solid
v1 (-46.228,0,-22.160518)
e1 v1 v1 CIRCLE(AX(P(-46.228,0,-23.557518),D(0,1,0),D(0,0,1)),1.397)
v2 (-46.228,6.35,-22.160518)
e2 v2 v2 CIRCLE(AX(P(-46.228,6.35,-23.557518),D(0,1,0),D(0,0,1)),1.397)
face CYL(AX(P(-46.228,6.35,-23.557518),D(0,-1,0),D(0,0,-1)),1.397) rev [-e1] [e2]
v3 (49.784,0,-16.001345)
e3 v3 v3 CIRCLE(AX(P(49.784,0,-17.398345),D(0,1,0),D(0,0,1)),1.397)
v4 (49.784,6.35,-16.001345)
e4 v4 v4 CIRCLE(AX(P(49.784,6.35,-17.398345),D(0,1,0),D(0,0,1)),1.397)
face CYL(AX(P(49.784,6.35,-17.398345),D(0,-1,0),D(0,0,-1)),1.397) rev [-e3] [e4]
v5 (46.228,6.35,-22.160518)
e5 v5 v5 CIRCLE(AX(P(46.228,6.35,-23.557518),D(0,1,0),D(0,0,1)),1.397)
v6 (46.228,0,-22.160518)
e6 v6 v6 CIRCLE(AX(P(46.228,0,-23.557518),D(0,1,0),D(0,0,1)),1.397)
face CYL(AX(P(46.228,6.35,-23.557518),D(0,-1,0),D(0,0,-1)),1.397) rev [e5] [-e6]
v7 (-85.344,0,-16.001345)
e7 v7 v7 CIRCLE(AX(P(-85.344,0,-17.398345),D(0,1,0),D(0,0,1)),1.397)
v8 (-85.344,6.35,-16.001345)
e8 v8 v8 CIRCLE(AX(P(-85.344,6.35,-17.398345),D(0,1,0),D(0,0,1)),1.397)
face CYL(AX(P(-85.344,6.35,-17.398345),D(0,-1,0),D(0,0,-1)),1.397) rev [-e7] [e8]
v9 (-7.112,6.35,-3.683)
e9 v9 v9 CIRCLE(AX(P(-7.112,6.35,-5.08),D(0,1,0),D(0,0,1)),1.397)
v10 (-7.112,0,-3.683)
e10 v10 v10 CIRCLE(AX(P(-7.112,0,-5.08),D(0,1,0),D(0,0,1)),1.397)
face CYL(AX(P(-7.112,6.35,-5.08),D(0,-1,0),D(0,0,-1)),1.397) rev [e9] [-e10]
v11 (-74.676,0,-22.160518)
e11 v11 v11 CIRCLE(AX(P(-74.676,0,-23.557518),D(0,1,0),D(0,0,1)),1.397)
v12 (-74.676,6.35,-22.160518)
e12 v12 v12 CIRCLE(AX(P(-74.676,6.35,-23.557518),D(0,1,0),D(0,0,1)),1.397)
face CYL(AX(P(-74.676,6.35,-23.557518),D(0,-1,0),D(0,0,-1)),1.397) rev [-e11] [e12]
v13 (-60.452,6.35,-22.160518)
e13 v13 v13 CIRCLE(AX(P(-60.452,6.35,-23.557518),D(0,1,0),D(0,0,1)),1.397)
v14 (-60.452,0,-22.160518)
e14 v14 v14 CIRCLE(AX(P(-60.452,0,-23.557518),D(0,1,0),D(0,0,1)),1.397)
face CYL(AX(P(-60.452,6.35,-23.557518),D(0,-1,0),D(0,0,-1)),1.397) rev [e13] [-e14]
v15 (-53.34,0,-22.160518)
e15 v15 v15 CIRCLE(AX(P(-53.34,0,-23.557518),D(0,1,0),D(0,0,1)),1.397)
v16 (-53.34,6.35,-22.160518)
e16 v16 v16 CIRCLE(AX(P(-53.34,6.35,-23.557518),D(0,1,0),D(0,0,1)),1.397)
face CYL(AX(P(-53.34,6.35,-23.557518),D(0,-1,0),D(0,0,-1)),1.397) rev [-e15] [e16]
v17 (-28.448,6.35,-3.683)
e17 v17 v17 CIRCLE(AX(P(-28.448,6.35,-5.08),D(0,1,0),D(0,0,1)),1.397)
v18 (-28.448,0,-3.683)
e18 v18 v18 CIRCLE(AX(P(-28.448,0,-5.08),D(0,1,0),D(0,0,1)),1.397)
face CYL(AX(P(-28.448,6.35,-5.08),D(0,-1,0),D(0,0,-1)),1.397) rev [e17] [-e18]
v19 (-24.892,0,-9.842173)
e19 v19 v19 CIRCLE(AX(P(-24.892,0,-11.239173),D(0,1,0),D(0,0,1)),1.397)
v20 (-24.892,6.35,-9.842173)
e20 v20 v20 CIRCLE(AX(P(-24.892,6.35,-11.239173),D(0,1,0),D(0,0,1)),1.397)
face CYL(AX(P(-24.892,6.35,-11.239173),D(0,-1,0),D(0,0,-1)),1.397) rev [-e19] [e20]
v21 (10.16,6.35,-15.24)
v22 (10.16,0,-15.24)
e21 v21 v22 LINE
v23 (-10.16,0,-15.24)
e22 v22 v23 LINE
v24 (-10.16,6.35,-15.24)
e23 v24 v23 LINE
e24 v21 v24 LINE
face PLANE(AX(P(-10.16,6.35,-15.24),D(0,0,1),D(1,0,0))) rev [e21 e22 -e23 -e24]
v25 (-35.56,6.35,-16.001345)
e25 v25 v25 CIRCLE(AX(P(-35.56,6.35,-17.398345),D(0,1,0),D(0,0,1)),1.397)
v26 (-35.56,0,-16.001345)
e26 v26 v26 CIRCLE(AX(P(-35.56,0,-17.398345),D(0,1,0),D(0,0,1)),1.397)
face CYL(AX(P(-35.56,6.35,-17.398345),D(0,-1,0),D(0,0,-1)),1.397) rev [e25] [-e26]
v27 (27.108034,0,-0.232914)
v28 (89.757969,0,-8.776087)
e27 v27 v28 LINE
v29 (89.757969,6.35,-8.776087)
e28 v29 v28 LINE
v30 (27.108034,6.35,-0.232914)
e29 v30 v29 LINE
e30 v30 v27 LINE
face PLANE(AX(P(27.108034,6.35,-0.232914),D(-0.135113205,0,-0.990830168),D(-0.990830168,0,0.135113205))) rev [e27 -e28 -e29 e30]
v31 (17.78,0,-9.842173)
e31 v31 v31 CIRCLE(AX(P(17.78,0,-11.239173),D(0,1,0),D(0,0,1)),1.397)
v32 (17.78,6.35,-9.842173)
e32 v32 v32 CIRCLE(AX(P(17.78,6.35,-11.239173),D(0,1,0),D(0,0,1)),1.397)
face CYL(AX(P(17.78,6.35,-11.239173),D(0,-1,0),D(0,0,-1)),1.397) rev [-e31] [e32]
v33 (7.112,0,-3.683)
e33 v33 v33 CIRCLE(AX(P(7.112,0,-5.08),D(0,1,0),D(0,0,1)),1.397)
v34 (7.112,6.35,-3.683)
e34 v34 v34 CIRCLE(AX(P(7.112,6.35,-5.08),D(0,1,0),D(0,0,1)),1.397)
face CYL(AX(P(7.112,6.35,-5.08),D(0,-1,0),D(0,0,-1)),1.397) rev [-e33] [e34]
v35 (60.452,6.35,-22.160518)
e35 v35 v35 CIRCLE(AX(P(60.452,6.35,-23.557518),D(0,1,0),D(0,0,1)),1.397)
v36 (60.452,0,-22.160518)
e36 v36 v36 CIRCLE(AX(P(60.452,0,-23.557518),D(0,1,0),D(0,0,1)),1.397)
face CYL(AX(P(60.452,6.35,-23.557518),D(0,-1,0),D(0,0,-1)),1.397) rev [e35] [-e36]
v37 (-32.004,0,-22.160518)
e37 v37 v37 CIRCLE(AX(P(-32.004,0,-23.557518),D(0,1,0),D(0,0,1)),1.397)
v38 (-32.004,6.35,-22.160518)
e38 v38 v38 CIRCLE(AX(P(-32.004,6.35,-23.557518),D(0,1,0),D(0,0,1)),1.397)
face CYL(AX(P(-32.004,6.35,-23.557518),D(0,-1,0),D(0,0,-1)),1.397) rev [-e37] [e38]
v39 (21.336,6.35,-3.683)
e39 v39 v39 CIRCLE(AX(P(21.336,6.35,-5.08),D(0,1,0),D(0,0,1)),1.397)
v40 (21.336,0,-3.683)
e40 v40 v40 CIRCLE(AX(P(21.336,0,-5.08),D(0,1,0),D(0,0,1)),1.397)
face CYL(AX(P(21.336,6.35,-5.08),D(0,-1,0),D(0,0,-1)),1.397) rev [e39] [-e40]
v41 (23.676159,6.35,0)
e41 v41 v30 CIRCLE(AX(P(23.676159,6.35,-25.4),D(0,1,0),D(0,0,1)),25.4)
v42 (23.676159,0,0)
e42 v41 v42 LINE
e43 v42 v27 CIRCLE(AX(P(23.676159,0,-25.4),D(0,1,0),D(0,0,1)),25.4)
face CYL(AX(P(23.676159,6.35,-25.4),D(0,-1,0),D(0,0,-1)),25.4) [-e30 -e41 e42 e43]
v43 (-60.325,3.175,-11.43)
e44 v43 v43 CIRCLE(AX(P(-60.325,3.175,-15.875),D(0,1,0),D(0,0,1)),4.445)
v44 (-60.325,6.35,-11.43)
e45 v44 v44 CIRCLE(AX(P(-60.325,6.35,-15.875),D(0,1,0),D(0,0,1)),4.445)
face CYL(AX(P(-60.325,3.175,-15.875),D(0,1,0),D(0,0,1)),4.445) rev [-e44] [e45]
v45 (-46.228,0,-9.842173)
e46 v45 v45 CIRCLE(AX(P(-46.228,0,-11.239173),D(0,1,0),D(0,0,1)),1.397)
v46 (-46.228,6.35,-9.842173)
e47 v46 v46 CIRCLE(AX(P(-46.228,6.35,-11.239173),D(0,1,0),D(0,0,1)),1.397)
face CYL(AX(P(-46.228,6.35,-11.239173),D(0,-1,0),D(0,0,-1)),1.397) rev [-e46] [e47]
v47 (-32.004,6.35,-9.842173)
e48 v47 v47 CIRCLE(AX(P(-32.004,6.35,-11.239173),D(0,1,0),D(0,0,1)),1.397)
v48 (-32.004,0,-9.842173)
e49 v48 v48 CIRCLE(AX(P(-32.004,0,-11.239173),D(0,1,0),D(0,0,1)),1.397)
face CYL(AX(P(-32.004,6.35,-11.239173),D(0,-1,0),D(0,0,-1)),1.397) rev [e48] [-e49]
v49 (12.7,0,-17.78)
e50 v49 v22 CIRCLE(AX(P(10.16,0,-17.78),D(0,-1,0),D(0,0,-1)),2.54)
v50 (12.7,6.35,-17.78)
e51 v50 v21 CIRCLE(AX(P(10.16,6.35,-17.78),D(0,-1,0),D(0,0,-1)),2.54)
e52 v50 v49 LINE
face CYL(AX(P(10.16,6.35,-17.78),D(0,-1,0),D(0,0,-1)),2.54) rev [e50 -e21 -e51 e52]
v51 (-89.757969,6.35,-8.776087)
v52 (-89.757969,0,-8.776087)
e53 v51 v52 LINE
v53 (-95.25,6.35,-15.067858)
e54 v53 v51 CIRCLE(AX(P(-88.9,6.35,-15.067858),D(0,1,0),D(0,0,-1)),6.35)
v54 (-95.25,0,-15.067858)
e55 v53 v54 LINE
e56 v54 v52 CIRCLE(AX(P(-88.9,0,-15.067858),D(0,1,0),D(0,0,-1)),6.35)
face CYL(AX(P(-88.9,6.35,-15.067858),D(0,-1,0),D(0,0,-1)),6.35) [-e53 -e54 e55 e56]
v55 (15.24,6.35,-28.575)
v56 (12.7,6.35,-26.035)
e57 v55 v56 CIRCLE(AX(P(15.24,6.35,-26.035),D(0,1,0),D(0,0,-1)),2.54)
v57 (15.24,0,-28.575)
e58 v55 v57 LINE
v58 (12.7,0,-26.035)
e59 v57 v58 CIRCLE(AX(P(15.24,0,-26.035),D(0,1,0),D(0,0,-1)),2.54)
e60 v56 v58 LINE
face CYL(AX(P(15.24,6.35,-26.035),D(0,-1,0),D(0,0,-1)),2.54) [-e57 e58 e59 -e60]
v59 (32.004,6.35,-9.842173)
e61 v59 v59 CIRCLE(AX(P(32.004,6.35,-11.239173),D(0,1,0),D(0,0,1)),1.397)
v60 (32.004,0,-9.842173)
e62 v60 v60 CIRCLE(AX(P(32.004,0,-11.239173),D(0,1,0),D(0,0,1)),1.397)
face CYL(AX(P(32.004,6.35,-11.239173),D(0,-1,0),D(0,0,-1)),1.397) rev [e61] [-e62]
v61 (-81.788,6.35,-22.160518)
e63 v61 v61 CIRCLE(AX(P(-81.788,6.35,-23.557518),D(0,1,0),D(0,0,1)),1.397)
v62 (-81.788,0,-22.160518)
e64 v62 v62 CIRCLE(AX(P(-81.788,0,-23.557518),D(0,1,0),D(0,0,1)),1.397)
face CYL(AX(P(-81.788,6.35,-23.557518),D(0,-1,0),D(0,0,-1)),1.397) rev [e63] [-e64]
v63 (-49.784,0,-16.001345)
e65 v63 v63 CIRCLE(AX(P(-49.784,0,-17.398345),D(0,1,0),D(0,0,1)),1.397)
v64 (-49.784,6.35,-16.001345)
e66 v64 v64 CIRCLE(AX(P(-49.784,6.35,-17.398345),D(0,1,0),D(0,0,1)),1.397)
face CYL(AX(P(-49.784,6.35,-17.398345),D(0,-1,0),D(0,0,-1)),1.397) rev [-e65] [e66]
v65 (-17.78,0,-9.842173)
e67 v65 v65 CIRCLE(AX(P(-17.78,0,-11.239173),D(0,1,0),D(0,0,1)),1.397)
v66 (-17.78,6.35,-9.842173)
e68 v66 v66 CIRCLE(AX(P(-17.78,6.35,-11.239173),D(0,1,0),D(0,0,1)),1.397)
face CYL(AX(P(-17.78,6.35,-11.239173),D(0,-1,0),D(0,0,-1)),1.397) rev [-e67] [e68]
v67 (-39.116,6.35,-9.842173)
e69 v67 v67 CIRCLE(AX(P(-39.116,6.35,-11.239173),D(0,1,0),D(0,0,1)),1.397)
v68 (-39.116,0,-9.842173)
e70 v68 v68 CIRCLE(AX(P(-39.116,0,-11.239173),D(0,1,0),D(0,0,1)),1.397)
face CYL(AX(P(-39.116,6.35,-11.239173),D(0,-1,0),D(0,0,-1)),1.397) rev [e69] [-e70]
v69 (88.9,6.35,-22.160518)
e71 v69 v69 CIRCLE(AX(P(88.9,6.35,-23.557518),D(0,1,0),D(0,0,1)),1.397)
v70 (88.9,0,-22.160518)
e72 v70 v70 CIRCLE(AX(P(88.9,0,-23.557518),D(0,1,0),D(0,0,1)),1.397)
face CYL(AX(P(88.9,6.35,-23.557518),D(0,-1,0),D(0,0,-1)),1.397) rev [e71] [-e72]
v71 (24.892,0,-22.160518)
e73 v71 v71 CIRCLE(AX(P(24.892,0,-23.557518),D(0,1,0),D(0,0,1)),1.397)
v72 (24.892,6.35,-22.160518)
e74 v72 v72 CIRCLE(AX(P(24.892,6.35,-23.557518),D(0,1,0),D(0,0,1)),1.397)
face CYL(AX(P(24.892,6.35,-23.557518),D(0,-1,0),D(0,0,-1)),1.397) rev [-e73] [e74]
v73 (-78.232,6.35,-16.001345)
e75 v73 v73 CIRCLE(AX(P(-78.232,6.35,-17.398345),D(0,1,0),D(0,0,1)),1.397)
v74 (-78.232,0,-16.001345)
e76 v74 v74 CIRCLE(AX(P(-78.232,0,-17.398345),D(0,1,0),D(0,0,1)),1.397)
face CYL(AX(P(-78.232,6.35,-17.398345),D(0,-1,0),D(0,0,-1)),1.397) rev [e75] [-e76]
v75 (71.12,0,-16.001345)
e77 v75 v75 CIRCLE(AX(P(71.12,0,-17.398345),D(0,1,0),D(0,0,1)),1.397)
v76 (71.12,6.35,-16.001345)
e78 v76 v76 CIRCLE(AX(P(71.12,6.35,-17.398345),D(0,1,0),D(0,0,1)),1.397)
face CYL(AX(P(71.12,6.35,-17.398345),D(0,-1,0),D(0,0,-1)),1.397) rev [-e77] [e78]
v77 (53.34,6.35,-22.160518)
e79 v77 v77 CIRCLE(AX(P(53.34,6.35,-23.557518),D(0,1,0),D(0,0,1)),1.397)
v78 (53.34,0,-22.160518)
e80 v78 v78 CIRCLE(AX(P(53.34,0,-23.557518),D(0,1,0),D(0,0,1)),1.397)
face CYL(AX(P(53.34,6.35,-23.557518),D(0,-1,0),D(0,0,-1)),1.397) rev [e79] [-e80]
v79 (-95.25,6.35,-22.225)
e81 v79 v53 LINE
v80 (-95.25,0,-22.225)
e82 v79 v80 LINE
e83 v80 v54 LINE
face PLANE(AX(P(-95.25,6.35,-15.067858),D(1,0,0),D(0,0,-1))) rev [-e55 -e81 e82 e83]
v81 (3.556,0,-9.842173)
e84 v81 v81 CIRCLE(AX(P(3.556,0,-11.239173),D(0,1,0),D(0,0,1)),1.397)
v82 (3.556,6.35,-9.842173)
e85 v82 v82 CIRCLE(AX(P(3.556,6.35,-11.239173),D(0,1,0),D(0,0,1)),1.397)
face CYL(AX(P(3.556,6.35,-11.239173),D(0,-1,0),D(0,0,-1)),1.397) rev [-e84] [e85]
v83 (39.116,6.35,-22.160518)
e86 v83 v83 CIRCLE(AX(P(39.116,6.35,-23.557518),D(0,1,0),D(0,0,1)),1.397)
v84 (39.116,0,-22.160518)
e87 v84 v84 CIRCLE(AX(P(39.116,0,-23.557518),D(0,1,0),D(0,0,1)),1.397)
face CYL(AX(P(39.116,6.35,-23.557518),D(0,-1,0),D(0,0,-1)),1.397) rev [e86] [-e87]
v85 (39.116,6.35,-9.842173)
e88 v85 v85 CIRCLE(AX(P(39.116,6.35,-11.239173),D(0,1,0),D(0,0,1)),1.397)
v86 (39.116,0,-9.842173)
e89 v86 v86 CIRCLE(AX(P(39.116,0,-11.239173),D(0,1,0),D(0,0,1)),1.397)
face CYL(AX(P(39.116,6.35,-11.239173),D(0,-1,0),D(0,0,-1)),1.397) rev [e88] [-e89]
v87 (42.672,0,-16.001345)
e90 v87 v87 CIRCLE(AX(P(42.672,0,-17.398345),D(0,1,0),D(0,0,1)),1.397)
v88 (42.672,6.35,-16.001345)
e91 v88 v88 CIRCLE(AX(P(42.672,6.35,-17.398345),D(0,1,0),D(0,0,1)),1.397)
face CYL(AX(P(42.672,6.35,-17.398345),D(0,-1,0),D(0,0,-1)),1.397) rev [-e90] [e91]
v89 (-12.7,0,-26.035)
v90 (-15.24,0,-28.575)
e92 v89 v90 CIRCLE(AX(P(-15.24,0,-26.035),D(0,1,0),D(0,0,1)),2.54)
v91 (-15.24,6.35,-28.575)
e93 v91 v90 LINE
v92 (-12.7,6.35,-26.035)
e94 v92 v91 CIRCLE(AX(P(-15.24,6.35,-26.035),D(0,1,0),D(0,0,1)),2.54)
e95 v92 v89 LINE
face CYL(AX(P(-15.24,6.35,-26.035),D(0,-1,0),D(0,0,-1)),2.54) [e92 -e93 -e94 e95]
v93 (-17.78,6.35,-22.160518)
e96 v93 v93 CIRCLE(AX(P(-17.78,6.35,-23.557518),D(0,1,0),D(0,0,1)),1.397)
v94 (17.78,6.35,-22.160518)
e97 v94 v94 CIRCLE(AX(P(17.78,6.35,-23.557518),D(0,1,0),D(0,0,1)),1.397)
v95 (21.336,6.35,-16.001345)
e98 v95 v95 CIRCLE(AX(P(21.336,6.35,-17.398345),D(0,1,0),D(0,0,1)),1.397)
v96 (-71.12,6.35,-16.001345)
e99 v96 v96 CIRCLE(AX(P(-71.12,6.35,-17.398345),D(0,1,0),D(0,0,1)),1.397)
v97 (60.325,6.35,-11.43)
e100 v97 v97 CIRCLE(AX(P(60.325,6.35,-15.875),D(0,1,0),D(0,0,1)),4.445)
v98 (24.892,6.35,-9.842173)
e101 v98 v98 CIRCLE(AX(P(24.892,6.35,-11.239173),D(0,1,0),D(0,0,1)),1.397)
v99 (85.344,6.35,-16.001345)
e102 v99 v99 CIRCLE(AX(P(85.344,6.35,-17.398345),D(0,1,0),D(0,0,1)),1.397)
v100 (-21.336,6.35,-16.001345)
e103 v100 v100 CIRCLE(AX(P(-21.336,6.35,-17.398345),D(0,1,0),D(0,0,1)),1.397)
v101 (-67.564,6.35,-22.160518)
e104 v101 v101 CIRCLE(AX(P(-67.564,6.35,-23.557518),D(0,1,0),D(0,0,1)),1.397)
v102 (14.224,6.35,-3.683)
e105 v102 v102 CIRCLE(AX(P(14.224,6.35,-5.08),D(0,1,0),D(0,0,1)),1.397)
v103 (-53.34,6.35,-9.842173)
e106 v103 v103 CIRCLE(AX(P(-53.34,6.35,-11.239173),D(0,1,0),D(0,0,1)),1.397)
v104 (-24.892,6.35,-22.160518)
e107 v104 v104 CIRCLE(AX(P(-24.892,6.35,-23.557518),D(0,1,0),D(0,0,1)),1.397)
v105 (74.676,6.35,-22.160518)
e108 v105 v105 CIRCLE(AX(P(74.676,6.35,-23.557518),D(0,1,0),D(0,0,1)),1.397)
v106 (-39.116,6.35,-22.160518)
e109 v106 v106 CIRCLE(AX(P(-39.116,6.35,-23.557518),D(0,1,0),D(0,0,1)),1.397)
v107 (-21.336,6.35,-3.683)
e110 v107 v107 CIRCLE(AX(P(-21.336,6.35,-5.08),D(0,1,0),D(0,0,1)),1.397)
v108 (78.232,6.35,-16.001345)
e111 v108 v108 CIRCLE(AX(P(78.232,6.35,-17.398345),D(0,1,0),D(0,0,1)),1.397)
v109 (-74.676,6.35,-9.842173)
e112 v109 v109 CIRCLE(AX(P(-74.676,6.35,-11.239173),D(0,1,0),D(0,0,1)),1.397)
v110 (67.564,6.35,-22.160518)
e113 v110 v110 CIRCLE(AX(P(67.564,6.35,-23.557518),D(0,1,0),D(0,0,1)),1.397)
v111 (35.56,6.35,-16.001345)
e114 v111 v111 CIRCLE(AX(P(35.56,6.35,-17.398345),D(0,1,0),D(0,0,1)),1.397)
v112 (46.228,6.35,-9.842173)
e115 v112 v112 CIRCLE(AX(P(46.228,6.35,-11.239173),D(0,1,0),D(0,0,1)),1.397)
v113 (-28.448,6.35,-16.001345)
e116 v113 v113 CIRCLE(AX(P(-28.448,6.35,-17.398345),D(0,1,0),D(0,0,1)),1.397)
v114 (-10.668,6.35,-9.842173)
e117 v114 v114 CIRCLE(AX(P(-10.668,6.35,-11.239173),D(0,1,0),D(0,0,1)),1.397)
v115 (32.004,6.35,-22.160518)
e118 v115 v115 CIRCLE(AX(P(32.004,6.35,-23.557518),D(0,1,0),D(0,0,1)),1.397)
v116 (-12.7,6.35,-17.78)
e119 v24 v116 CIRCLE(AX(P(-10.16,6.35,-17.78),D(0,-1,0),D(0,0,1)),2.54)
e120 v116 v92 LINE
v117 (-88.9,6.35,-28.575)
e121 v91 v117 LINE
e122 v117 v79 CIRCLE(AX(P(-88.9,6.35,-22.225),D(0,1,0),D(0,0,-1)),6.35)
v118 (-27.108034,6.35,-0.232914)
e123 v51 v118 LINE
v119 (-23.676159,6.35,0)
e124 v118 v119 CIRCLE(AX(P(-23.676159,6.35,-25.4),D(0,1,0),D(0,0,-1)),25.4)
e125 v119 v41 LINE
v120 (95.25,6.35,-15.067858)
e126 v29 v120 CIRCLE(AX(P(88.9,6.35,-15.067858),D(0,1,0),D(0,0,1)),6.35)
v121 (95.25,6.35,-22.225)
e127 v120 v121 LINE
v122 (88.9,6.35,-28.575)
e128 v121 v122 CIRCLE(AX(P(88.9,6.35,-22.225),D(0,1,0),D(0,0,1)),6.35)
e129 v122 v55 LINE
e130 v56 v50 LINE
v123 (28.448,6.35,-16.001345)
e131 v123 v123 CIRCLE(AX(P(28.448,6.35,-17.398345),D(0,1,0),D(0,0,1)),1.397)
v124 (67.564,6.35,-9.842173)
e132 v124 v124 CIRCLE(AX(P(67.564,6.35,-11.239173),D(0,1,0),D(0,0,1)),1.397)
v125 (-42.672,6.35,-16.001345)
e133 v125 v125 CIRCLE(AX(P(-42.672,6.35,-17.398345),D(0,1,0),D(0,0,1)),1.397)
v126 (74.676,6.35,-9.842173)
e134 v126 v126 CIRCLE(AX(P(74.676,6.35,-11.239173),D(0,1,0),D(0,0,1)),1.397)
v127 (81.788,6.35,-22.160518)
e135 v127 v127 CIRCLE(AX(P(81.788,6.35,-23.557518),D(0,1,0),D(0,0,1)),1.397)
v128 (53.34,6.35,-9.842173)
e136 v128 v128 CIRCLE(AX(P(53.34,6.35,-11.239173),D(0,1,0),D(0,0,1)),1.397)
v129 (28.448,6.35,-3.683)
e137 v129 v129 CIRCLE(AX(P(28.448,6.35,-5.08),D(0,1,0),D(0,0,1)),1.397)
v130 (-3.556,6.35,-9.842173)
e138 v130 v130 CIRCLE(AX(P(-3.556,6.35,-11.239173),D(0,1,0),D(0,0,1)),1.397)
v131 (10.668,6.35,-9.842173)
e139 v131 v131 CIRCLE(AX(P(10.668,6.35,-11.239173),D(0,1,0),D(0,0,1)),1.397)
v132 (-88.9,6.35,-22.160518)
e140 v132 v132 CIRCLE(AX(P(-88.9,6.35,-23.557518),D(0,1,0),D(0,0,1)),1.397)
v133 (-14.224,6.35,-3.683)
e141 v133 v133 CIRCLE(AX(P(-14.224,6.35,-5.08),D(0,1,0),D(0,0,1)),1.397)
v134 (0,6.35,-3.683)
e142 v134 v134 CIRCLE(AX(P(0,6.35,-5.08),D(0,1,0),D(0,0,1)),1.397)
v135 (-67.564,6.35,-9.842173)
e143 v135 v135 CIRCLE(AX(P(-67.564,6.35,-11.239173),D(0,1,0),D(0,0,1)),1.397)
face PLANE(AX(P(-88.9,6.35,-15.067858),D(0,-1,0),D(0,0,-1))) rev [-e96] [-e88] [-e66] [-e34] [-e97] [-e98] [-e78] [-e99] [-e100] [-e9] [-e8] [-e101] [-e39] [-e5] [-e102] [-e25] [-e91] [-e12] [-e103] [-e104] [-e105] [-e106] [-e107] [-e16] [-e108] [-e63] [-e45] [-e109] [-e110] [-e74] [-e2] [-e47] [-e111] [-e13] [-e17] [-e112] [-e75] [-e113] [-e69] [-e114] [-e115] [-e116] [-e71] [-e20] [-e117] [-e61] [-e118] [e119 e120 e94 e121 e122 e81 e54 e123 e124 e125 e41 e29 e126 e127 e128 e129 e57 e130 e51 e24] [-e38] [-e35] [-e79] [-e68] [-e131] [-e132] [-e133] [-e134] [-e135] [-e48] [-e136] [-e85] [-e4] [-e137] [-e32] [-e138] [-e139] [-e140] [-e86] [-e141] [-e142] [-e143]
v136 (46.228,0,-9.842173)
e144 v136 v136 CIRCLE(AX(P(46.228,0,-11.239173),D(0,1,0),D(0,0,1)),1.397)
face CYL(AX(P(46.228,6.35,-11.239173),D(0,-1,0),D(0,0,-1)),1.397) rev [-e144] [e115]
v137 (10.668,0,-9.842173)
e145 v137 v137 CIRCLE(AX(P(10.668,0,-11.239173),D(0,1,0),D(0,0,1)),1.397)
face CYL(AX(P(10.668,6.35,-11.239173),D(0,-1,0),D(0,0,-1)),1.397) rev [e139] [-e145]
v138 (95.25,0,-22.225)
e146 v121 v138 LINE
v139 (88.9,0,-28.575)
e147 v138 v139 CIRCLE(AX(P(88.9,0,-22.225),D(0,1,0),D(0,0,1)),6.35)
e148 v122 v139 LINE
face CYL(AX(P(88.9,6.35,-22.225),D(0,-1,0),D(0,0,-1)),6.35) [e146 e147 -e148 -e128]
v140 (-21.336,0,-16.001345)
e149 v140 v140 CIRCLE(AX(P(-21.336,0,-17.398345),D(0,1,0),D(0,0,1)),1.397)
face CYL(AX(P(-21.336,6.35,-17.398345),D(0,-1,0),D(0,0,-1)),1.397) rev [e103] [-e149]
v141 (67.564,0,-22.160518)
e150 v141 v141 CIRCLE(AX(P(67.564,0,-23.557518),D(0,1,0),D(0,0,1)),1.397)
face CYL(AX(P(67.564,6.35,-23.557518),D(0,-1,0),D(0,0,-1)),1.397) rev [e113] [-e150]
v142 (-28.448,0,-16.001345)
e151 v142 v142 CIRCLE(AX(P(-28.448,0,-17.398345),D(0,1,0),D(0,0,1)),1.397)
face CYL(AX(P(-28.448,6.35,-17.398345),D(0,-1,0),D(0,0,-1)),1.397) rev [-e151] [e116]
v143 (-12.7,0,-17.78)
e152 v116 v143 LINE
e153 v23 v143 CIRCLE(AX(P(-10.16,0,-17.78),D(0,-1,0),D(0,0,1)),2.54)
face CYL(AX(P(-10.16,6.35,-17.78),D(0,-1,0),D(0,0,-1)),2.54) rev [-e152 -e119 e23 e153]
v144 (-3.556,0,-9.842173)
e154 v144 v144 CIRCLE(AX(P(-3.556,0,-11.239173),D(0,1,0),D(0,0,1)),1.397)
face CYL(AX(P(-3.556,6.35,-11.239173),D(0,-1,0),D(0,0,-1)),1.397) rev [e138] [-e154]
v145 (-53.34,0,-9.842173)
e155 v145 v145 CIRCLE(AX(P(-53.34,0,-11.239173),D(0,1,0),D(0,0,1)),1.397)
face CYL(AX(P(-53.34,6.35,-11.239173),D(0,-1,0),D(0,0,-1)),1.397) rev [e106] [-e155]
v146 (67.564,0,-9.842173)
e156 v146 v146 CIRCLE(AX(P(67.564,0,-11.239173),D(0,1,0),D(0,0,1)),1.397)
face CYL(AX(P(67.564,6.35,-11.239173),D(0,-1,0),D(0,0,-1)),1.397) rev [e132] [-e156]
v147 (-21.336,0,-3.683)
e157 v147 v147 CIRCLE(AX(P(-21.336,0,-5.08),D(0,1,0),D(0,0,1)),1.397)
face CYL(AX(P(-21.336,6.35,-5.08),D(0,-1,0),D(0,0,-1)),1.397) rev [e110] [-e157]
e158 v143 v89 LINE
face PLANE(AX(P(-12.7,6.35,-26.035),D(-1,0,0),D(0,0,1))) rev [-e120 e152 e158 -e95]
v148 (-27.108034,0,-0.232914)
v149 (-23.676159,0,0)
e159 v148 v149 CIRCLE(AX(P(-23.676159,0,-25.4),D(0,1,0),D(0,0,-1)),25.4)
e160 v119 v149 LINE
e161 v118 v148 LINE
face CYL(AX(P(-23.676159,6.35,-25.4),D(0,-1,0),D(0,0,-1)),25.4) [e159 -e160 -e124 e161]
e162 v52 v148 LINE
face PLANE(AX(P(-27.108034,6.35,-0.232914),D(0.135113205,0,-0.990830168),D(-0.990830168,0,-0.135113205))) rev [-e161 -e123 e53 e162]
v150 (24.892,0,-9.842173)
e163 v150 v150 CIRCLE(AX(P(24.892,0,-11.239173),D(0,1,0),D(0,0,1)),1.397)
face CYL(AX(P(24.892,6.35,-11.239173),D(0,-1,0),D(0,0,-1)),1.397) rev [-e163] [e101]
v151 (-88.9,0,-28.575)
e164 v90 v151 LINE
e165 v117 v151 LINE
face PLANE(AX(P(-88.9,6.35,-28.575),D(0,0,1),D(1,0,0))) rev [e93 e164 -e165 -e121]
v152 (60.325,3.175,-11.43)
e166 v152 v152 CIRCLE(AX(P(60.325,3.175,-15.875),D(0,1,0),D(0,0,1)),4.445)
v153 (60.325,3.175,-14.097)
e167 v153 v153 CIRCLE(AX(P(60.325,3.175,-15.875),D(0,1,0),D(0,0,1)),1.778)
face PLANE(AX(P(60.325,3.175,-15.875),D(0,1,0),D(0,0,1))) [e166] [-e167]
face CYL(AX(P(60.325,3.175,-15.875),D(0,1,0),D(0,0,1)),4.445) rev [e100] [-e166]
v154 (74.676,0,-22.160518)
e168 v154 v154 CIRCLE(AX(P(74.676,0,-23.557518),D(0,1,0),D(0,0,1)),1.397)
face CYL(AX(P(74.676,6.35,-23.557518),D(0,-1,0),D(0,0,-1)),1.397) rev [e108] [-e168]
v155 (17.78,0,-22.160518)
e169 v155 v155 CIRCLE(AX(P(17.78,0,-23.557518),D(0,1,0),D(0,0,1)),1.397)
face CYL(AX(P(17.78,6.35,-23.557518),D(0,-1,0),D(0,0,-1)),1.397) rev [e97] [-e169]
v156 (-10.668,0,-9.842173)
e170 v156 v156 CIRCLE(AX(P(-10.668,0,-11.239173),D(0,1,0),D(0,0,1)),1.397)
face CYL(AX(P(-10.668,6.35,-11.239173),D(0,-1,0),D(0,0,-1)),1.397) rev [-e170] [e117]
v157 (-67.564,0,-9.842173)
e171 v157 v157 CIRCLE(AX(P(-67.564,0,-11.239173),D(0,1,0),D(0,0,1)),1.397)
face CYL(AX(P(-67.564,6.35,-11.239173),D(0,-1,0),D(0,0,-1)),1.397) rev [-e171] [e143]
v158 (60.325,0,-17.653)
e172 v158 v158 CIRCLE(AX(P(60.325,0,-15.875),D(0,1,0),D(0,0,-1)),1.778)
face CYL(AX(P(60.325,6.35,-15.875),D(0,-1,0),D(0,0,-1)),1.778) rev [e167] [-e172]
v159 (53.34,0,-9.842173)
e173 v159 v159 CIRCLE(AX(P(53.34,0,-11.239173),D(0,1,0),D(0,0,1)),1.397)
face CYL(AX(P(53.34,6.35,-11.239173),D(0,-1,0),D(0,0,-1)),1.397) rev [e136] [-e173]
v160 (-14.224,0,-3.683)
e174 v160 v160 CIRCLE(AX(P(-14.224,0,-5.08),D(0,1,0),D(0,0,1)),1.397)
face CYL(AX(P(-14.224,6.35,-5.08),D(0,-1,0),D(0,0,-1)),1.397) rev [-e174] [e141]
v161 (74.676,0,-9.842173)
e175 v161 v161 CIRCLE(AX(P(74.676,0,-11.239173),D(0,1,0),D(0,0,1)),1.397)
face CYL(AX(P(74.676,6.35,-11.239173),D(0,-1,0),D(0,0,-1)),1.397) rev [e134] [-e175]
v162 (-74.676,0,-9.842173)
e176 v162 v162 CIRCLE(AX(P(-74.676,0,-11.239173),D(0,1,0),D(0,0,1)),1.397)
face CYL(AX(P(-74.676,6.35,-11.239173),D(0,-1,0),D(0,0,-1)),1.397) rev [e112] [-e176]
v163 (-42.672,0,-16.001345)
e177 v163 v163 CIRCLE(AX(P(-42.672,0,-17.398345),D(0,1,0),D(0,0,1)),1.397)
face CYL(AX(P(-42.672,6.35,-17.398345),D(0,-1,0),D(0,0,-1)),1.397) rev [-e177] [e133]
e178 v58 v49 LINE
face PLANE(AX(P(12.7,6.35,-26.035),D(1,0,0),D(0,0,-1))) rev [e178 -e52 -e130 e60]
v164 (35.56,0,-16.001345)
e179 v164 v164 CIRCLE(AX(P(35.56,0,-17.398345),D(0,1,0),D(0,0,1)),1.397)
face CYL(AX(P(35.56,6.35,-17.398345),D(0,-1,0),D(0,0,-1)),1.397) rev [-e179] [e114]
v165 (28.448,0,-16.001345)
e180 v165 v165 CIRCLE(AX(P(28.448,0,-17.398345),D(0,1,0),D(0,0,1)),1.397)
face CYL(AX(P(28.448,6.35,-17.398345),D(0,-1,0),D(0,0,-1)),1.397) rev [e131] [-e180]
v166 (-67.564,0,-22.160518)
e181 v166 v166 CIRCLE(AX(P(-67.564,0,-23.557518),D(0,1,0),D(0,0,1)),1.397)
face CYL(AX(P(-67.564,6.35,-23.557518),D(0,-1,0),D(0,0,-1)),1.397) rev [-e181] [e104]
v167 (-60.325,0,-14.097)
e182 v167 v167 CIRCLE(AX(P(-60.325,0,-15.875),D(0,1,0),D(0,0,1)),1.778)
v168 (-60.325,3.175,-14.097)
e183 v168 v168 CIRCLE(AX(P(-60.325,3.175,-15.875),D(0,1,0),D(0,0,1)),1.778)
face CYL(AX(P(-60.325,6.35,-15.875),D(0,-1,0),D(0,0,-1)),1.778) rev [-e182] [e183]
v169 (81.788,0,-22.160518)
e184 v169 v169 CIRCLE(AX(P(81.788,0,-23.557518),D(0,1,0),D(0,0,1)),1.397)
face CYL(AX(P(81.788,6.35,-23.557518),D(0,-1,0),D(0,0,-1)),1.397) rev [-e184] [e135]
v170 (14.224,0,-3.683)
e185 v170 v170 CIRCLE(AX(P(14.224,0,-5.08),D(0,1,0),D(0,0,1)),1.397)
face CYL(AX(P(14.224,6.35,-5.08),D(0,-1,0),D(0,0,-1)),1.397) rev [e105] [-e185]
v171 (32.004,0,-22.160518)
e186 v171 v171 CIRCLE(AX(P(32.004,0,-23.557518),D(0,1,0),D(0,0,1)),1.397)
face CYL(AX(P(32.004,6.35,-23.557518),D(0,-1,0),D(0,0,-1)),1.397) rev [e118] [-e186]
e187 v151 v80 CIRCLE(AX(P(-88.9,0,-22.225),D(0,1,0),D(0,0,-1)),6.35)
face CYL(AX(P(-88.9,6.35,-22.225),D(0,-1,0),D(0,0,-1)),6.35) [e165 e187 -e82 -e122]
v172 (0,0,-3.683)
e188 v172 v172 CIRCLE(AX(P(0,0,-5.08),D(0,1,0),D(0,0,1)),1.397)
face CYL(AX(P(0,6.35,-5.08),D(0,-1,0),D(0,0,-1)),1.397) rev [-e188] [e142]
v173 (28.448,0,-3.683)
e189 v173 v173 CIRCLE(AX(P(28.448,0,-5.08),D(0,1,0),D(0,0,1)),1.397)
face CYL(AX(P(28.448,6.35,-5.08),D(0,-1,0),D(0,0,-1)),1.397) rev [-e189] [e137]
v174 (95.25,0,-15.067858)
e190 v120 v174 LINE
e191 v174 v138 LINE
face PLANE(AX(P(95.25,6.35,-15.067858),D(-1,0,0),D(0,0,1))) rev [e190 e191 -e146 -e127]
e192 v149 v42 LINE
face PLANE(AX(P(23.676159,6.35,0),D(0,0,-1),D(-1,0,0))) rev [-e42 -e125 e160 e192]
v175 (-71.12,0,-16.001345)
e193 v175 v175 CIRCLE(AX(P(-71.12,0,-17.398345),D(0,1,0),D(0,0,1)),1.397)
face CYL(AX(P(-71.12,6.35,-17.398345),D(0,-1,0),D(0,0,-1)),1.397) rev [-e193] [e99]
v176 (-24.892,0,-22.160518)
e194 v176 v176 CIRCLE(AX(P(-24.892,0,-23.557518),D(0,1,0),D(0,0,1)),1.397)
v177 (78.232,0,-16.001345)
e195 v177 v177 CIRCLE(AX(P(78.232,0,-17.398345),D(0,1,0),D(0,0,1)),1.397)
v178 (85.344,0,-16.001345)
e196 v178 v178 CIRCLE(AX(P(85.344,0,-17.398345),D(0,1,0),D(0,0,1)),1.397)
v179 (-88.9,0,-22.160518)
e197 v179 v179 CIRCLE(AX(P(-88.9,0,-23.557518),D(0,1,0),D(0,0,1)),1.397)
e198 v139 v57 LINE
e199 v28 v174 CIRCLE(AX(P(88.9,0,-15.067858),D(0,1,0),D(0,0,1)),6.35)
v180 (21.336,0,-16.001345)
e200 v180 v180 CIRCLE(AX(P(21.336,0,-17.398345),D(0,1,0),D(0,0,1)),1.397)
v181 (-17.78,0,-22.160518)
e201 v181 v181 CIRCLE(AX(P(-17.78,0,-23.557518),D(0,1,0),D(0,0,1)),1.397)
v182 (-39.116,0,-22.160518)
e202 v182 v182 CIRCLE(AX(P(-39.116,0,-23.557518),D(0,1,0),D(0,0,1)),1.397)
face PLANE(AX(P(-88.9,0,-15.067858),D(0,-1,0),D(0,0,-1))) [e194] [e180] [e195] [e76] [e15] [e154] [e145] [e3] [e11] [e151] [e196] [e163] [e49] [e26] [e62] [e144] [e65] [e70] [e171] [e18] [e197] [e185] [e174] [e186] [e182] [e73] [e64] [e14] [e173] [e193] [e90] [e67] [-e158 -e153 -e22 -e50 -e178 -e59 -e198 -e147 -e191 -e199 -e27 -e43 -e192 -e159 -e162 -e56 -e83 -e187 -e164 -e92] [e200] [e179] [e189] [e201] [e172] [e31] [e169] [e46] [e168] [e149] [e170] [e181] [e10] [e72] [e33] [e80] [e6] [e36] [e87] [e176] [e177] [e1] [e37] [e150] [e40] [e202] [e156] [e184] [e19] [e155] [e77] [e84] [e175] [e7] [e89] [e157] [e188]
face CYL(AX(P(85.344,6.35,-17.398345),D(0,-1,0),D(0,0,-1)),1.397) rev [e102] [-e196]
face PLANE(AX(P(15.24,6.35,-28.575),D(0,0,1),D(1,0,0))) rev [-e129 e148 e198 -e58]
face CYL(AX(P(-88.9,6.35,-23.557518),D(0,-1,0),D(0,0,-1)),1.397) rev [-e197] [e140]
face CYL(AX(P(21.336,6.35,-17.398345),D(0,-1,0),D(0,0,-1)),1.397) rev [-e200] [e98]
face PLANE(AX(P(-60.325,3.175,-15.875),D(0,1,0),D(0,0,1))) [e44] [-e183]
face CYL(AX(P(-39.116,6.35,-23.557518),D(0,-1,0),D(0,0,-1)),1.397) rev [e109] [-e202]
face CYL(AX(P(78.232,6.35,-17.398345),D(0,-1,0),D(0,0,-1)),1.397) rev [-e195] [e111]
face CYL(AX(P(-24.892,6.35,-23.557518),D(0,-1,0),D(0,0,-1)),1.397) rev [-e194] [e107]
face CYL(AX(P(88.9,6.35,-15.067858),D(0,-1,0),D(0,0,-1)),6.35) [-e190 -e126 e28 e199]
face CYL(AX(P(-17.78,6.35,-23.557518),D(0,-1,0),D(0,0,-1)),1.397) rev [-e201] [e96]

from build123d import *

# Parameters (mm, degrees)
SKETCH1_R               = 1.778
BOSS_EXTRUDE1_DEPTH     = 6.35
SKETCH2_R               = 1.397
CUT_EXTRUDE1_DEPTH      = 100.646453148
FILL_PATTERN1_OUTLINE_R = 1.397
FILL_PATTERN1_DEPTH     = 6.35
SKETCH3_R               = 4.445
CUT_EXTRUDE2_DEPTH      = 3.175


# Read off the part's stored shape, not the designer's step: Fill Pattern1
with BuildPart() as part:
    # Sketch1 → Boss-Extrude1 (new body)
    with BuildSketch(Plane(origin=(0, 0, 0), x_dir=(1, 0, 0), z_dir=(0, 1, 0))):
        with BuildLine():
            Line((23.676158632, 0), (-23.676158632, 0))
            ThreePointArc((-23.676158632, 0), (-25.396043626, 0.058295329), (-27.108034032, 0.232913732))
            Line((-27.108034032, 0.232913732), (-89.75796885, 8.776086661))
            ThreePointArc((-89.75796885, 8.776086661), (-93.68385839, 10.892071009), (-95.25, 15.067858228))
            Line((-95.25, 15.067858228), (-95.25, 22.225))
            ThreePointArc((-95.25, 22.225), (-93.390128061, 26.715128061), (-88.9, 28.575))
            Line((-88.9, 28.575), (-15.24, 28.575))
            ThreePointArc((-15.24, 28.575), (-13.443948776, 27.831051224), (-12.7, 26.035))
            Line((-12.7, 26.035), (-12.7, 17.78))
            ThreePointArc((-12.7, 17.78), (-11.956051224, 15.983948776), (-10.16, 15.24))
            Line((-10.16, 15.24), (10.16, 15.24))
            ThreePointArc((10.16, 15.24), (11.956051224, 15.983948776), (12.7, 17.78))
            Line((12.7, 17.78), (12.7, 26.035))
            ThreePointArc((12.7, 26.035), (13.443948776, 27.831051224), (15.24, 28.575))
            Line((15.24, 28.575), (88.9, 28.575))
            ThreePointArc((88.9, 28.575), (93.390128061, 26.715128061), (95.25, 22.225))
            Line((95.25, 22.225), (95.25, 15.067858228))
            ThreePointArc((95.25, 15.067858228), (93.68385839, 10.892071009), (89.75796885, 8.776086661))
            Line((89.75796885, 8.776086661), (27.108034032, 0.232913732))
            ThreePointArc((27.108034032, 0.232913732), (25.396043626, 0.058295329), (23.676158632, 0))
        make_face()
        with Locations(Location((-60.325, 15.875, 0), (0, 0, 270))):
            Circle(SKETCH1_R, mode=Mode.SUBTRACT)
        with Locations(Location((60.325, 15.875, 0), (0, 0, 90))):
            Circle(SKETCH1_R, mode=Mode.SUBTRACT)
    extrude(amount=BOSS_EXTRUDE1_DEPTH)

    # Sketch2 → Cut-Extrude1 (cut, through all)
    with BuildSketch(Plane(origin=(0, 0, 0), x_dir=(1, 0, 0), z_dir=(0, 1, 0))):
        with Locations(Location((0, 5.08, 0), (0, 0, 270))):
            Circle(SKETCH2_R)
    extrude(amount=CUT_EXTRUDE1_DEPTH, mode=Mode.SUBTRACT)

    # Fill Pattern1 outline → Fill Pattern1 (cut)
    with BuildSketch(Plane(origin=(0, 0, 0), x_dir=(1, 0, 0), z_dir=(0, 1, 0))):
        with Locations((-88.9, 23.557518015)):
            Circle(FILL_PATTERN1_OUTLINE_R)
        with Locations((-85.344, 17.398345343)):
            Circle(FILL_PATTERN1_OUTLINE_R)
        with Locations((-81.788, 23.557518015)):
            Circle(FILL_PATTERN1_OUTLINE_R)
        with Locations((-78.232, 17.398345343)):
            Circle(FILL_PATTERN1_OUTLINE_R)
        with Locations((-74.676, 23.557518015)):
            Circle(FILL_PATTERN1_OUTLINE_R)
        with Locations((-74.676, 11.239172672)):
            Circle(FILL_PATTERN1_OUTLINE_R)
        with Locations((-71.12, 17.398345343)):
            Circle(FILL_PATTERN1_OUTLINE_R)
        with Locations((-67.564, 23.557518015)):
            Circle(FILL_PATTERN1_OUTLINE_R)
        with Locations((-67.564, 11.239172672)):
            Circle(FILL_PATTERN1_OUTLINE_R)
        with Locations((-60.452, 23.557518015)):
            Circle(FILL_PATTERN1_OUTLINE_R)
        with Locations((-53.34, 23.557518015)):
            Circle(FILL_PATTERN1_OUTLINE_R)
        with Locations((-53.34, 11.239172672)):
            Circle(FILL_PATTERN1_OUTLINE_R)
        with Locations((-49.784, 17.398345343)):
            Circle(FILL_PATTERN1_OUTLINE_R)
        with Locations((-46.228, 23.557518015)):
            Circle(FILL_PATTERN1_OUTLINE_R)
        with Locations((-46.228, 11.239172672)):
            Circle(FILL_PATTERN1_OUTLINE_R)
        with Locations((-42.672, 17.398345343)):
            Circle(FILL_PATTERN1_OUTLINE_R)
        with Locations((-39.116, 23.557518015)):
            Circle(FILL_PATTERN1_OUTLINE_R)
        with Locations((-39.116, 11.239172672)):
            Circle(FILL_PATTERN1_OUTLINE_R)
        with Locations((-35.56, 17.398345343)):
            Circle(FILL_PATTERN1_OUTLINE_R)
        with Locations((-32.004, 23.557518015)):
            Circle(FILL_PATTERN1_OUTLINE_R)
        with Locations((-32.004, 11.239172672)):
            Circle(FILL_PATTERN1_OUTLINE_R)
        with Locations((-28.448, 17.398345343)):
            Circle(FILL_PATTERN1_OUTLINE_R)
        with Locations((-24.892, 23.557518015)):
            Circle(FILL_PATTERN1_OUTLINE_R)
        with Locations((-28.448, 5.08)):
            Circle(FILL_PATTERN1_OUTLINE_R)
        with Locations((-24.892, 11.239172672)):
            Circle(FILL_PATTERN1_OUTLINE_R)
        with Locations((-21.336, 17.398345343)):
            Circle(FILL_PATTERN1_OUTLINE_R)
        with Locations((-17.78, 23.557518015)):
            Circle(FILL_PATTERN1_OUTLINE_R)
        with Locations((-21.336, 5.08)):
            Circle(FILL_PATTERN1_OUTLINE_R)
        with Locations((-17.78, 11.239172672)):
            Circle(FILL_PATTERN1_OUTLINE_R)
        with Locations((-14.224, 5.08)):
            Circle(FILL_PATTERN1_OUTLINE_R)
        with Locations((-10.668, 11.239172672)):
            Circle(FILL_PATTERN1_OUTLINE_R)
        with Locations((-7.112, 5.08)):
            Circle(FILL_PATTERN1_OUTLINE_R)
        with Locations((-3.556, 11.239172672)):
            Circle(FILL_PATTERN1_OUTLINE_R)
        with Locations((3.556, 11.239172672)):
            Circle(FILL_PATTERN1_OUTLINE_R)
        with Locations((7.112, 5.08)):
            Circle(FILL_PATTERN1_OUTLINE_R)
        with Locations((10.668, 11.239172672)):
            Circle(FILL_PATTERN1_OUTLINE_R)
        with Locations((17.78, 23.557518015)):
            Circle(FILL_PATTERN1_OUTLINE_R)
        with Locations((14.224, 5.08)):
            Circle(FILL_PATTERN1_OUTLINE_R)
        with Locations((17.78, 11.239172672)):
            Circle(FILL_PATTERN1_OUTLINE_R)
        with Locations((21.336, 17.398345343)):
            Circle(FILL_PATTERN1_OUTLINE_R)
        with Locations((24.892, 23.557518015)):
            Circle(FILL_PATTERN1_OUTLINE_R)
        with Locations((21.336, 5.08)):
            Circle(FILL_PATTERN1_OUTLINE_R)
        with Locations((24.892, 11.239172672)):
            Circle(FILL_PATTERN1_OUTLINE_R)
        with Locations((28.448, 17.398345343)):
            Circle(FILL_PATTERN1_OUTLINE_R)
        with Locations((32.004, 23.557518015)):
            Circle(FILL_PATTERN1_OUTLINE_R)
        with Locations((28.448, 5.08)):
            Circle(FILL_PATTERN1_OUTLINE_R)
        with Locations((32.004, 11.239172672)):
            Circle(FILL_PATTERN1_OUTLINE_R)
        with Locations((35.56, 17.398345343)):
            Circle(FILL_PATTERN1_OUTLINE_R)
        with Locations((39.116, 23.557518015)):
            Circle(FILL_PATTERN1_OUTLINE_R)
        with Locations((39.116, 11.239172672)):
            Circle(FILL_PATTERN1_OUTLINE_R)
        with Locations((42.672, 17.398345343)):
            Circle(FILL_PATTERN1_OUTLINE_R)
        with Locations((46.228, 23.557518015)):
            Circle(FILL_PATTERN1_OUTLINE_R)
        with Locations((46.228, 11.239172672)):
            Circle(FILL_PATTERN1_OUTLINE_R)
        with Locations((49.784, 17.398345343)):
            Circle(FILL_PATTERN1_OUTLINE_R)
        with Locations((53.34, 23.557518015)):
            Circle(FILL_PATTERN1_OUTLINE_R)
        with Locations((53.34, 11.239172672)):
            Circle(FILL_PATTERN1_OUTLINE_R)
        with Locations((60.452, 23.557518015)):
            Circle(FILL_PATTERN1_OUTLINE_R)
        with Locations((67.564, 23.557518015)):
            Circle(FILL_PATTERN1_OUTLINE_R)
        with Locations((67.564, 11.239172672)):
            Circle(FILL_PATTERN1_OUTLINE_R)
        with Locations((71.12, 17.398345343)):
            Circle(FILL_PATTERN1_OUTLINE_R)
        with Locations((74.676, 23.557518015)):
            Circle(FILL_PATTERN1_OUTLINE_R)
        with Locations((74.676, 11.239172672)):
            Circle(FILL_PATTERN1_OUTLINE_R)
        with Locations((78.232, 17.398345343)):
            Circle(FILL_PATTERN1_OUTLINE_R)
        with Locations((81.788, 23.557518015)):
            Circle(FILL_PATTERN1_OUTLINE_R)
        with Locations((85.344, 17.398345343)):
            Circle(FILL_PATTERN1_OUTLINE_R)
        with Locations((88.9, 23.557518015)):
            Circle(FILL_PATTERN1_OUTLINE_R)
    extrude(amount=FILL_PATTERN1_DEPTH, mode=Mode.SUBTRACT)

    # Sketch3 → Cut-Extrude2 (cut)
    with BuildSketch(Plane(origin=(0, 6.35, 0), x_dir=(1, 0, 0), z_dir=(0, 1, 0))):
        with Locations(Location((-60.325, 15.875, 0), (0, 0, 270))):
            Circle(SKETCH3_R)
        with Locations(Location((60.325, 15.875, 0), (0, 0, 270))):
            Circle(SKETCH3_R)
    extrude(amount=-CUT_EXTRUDE2_DEPTH, mode=Mode.SUBTRACT)


solid = part.part
